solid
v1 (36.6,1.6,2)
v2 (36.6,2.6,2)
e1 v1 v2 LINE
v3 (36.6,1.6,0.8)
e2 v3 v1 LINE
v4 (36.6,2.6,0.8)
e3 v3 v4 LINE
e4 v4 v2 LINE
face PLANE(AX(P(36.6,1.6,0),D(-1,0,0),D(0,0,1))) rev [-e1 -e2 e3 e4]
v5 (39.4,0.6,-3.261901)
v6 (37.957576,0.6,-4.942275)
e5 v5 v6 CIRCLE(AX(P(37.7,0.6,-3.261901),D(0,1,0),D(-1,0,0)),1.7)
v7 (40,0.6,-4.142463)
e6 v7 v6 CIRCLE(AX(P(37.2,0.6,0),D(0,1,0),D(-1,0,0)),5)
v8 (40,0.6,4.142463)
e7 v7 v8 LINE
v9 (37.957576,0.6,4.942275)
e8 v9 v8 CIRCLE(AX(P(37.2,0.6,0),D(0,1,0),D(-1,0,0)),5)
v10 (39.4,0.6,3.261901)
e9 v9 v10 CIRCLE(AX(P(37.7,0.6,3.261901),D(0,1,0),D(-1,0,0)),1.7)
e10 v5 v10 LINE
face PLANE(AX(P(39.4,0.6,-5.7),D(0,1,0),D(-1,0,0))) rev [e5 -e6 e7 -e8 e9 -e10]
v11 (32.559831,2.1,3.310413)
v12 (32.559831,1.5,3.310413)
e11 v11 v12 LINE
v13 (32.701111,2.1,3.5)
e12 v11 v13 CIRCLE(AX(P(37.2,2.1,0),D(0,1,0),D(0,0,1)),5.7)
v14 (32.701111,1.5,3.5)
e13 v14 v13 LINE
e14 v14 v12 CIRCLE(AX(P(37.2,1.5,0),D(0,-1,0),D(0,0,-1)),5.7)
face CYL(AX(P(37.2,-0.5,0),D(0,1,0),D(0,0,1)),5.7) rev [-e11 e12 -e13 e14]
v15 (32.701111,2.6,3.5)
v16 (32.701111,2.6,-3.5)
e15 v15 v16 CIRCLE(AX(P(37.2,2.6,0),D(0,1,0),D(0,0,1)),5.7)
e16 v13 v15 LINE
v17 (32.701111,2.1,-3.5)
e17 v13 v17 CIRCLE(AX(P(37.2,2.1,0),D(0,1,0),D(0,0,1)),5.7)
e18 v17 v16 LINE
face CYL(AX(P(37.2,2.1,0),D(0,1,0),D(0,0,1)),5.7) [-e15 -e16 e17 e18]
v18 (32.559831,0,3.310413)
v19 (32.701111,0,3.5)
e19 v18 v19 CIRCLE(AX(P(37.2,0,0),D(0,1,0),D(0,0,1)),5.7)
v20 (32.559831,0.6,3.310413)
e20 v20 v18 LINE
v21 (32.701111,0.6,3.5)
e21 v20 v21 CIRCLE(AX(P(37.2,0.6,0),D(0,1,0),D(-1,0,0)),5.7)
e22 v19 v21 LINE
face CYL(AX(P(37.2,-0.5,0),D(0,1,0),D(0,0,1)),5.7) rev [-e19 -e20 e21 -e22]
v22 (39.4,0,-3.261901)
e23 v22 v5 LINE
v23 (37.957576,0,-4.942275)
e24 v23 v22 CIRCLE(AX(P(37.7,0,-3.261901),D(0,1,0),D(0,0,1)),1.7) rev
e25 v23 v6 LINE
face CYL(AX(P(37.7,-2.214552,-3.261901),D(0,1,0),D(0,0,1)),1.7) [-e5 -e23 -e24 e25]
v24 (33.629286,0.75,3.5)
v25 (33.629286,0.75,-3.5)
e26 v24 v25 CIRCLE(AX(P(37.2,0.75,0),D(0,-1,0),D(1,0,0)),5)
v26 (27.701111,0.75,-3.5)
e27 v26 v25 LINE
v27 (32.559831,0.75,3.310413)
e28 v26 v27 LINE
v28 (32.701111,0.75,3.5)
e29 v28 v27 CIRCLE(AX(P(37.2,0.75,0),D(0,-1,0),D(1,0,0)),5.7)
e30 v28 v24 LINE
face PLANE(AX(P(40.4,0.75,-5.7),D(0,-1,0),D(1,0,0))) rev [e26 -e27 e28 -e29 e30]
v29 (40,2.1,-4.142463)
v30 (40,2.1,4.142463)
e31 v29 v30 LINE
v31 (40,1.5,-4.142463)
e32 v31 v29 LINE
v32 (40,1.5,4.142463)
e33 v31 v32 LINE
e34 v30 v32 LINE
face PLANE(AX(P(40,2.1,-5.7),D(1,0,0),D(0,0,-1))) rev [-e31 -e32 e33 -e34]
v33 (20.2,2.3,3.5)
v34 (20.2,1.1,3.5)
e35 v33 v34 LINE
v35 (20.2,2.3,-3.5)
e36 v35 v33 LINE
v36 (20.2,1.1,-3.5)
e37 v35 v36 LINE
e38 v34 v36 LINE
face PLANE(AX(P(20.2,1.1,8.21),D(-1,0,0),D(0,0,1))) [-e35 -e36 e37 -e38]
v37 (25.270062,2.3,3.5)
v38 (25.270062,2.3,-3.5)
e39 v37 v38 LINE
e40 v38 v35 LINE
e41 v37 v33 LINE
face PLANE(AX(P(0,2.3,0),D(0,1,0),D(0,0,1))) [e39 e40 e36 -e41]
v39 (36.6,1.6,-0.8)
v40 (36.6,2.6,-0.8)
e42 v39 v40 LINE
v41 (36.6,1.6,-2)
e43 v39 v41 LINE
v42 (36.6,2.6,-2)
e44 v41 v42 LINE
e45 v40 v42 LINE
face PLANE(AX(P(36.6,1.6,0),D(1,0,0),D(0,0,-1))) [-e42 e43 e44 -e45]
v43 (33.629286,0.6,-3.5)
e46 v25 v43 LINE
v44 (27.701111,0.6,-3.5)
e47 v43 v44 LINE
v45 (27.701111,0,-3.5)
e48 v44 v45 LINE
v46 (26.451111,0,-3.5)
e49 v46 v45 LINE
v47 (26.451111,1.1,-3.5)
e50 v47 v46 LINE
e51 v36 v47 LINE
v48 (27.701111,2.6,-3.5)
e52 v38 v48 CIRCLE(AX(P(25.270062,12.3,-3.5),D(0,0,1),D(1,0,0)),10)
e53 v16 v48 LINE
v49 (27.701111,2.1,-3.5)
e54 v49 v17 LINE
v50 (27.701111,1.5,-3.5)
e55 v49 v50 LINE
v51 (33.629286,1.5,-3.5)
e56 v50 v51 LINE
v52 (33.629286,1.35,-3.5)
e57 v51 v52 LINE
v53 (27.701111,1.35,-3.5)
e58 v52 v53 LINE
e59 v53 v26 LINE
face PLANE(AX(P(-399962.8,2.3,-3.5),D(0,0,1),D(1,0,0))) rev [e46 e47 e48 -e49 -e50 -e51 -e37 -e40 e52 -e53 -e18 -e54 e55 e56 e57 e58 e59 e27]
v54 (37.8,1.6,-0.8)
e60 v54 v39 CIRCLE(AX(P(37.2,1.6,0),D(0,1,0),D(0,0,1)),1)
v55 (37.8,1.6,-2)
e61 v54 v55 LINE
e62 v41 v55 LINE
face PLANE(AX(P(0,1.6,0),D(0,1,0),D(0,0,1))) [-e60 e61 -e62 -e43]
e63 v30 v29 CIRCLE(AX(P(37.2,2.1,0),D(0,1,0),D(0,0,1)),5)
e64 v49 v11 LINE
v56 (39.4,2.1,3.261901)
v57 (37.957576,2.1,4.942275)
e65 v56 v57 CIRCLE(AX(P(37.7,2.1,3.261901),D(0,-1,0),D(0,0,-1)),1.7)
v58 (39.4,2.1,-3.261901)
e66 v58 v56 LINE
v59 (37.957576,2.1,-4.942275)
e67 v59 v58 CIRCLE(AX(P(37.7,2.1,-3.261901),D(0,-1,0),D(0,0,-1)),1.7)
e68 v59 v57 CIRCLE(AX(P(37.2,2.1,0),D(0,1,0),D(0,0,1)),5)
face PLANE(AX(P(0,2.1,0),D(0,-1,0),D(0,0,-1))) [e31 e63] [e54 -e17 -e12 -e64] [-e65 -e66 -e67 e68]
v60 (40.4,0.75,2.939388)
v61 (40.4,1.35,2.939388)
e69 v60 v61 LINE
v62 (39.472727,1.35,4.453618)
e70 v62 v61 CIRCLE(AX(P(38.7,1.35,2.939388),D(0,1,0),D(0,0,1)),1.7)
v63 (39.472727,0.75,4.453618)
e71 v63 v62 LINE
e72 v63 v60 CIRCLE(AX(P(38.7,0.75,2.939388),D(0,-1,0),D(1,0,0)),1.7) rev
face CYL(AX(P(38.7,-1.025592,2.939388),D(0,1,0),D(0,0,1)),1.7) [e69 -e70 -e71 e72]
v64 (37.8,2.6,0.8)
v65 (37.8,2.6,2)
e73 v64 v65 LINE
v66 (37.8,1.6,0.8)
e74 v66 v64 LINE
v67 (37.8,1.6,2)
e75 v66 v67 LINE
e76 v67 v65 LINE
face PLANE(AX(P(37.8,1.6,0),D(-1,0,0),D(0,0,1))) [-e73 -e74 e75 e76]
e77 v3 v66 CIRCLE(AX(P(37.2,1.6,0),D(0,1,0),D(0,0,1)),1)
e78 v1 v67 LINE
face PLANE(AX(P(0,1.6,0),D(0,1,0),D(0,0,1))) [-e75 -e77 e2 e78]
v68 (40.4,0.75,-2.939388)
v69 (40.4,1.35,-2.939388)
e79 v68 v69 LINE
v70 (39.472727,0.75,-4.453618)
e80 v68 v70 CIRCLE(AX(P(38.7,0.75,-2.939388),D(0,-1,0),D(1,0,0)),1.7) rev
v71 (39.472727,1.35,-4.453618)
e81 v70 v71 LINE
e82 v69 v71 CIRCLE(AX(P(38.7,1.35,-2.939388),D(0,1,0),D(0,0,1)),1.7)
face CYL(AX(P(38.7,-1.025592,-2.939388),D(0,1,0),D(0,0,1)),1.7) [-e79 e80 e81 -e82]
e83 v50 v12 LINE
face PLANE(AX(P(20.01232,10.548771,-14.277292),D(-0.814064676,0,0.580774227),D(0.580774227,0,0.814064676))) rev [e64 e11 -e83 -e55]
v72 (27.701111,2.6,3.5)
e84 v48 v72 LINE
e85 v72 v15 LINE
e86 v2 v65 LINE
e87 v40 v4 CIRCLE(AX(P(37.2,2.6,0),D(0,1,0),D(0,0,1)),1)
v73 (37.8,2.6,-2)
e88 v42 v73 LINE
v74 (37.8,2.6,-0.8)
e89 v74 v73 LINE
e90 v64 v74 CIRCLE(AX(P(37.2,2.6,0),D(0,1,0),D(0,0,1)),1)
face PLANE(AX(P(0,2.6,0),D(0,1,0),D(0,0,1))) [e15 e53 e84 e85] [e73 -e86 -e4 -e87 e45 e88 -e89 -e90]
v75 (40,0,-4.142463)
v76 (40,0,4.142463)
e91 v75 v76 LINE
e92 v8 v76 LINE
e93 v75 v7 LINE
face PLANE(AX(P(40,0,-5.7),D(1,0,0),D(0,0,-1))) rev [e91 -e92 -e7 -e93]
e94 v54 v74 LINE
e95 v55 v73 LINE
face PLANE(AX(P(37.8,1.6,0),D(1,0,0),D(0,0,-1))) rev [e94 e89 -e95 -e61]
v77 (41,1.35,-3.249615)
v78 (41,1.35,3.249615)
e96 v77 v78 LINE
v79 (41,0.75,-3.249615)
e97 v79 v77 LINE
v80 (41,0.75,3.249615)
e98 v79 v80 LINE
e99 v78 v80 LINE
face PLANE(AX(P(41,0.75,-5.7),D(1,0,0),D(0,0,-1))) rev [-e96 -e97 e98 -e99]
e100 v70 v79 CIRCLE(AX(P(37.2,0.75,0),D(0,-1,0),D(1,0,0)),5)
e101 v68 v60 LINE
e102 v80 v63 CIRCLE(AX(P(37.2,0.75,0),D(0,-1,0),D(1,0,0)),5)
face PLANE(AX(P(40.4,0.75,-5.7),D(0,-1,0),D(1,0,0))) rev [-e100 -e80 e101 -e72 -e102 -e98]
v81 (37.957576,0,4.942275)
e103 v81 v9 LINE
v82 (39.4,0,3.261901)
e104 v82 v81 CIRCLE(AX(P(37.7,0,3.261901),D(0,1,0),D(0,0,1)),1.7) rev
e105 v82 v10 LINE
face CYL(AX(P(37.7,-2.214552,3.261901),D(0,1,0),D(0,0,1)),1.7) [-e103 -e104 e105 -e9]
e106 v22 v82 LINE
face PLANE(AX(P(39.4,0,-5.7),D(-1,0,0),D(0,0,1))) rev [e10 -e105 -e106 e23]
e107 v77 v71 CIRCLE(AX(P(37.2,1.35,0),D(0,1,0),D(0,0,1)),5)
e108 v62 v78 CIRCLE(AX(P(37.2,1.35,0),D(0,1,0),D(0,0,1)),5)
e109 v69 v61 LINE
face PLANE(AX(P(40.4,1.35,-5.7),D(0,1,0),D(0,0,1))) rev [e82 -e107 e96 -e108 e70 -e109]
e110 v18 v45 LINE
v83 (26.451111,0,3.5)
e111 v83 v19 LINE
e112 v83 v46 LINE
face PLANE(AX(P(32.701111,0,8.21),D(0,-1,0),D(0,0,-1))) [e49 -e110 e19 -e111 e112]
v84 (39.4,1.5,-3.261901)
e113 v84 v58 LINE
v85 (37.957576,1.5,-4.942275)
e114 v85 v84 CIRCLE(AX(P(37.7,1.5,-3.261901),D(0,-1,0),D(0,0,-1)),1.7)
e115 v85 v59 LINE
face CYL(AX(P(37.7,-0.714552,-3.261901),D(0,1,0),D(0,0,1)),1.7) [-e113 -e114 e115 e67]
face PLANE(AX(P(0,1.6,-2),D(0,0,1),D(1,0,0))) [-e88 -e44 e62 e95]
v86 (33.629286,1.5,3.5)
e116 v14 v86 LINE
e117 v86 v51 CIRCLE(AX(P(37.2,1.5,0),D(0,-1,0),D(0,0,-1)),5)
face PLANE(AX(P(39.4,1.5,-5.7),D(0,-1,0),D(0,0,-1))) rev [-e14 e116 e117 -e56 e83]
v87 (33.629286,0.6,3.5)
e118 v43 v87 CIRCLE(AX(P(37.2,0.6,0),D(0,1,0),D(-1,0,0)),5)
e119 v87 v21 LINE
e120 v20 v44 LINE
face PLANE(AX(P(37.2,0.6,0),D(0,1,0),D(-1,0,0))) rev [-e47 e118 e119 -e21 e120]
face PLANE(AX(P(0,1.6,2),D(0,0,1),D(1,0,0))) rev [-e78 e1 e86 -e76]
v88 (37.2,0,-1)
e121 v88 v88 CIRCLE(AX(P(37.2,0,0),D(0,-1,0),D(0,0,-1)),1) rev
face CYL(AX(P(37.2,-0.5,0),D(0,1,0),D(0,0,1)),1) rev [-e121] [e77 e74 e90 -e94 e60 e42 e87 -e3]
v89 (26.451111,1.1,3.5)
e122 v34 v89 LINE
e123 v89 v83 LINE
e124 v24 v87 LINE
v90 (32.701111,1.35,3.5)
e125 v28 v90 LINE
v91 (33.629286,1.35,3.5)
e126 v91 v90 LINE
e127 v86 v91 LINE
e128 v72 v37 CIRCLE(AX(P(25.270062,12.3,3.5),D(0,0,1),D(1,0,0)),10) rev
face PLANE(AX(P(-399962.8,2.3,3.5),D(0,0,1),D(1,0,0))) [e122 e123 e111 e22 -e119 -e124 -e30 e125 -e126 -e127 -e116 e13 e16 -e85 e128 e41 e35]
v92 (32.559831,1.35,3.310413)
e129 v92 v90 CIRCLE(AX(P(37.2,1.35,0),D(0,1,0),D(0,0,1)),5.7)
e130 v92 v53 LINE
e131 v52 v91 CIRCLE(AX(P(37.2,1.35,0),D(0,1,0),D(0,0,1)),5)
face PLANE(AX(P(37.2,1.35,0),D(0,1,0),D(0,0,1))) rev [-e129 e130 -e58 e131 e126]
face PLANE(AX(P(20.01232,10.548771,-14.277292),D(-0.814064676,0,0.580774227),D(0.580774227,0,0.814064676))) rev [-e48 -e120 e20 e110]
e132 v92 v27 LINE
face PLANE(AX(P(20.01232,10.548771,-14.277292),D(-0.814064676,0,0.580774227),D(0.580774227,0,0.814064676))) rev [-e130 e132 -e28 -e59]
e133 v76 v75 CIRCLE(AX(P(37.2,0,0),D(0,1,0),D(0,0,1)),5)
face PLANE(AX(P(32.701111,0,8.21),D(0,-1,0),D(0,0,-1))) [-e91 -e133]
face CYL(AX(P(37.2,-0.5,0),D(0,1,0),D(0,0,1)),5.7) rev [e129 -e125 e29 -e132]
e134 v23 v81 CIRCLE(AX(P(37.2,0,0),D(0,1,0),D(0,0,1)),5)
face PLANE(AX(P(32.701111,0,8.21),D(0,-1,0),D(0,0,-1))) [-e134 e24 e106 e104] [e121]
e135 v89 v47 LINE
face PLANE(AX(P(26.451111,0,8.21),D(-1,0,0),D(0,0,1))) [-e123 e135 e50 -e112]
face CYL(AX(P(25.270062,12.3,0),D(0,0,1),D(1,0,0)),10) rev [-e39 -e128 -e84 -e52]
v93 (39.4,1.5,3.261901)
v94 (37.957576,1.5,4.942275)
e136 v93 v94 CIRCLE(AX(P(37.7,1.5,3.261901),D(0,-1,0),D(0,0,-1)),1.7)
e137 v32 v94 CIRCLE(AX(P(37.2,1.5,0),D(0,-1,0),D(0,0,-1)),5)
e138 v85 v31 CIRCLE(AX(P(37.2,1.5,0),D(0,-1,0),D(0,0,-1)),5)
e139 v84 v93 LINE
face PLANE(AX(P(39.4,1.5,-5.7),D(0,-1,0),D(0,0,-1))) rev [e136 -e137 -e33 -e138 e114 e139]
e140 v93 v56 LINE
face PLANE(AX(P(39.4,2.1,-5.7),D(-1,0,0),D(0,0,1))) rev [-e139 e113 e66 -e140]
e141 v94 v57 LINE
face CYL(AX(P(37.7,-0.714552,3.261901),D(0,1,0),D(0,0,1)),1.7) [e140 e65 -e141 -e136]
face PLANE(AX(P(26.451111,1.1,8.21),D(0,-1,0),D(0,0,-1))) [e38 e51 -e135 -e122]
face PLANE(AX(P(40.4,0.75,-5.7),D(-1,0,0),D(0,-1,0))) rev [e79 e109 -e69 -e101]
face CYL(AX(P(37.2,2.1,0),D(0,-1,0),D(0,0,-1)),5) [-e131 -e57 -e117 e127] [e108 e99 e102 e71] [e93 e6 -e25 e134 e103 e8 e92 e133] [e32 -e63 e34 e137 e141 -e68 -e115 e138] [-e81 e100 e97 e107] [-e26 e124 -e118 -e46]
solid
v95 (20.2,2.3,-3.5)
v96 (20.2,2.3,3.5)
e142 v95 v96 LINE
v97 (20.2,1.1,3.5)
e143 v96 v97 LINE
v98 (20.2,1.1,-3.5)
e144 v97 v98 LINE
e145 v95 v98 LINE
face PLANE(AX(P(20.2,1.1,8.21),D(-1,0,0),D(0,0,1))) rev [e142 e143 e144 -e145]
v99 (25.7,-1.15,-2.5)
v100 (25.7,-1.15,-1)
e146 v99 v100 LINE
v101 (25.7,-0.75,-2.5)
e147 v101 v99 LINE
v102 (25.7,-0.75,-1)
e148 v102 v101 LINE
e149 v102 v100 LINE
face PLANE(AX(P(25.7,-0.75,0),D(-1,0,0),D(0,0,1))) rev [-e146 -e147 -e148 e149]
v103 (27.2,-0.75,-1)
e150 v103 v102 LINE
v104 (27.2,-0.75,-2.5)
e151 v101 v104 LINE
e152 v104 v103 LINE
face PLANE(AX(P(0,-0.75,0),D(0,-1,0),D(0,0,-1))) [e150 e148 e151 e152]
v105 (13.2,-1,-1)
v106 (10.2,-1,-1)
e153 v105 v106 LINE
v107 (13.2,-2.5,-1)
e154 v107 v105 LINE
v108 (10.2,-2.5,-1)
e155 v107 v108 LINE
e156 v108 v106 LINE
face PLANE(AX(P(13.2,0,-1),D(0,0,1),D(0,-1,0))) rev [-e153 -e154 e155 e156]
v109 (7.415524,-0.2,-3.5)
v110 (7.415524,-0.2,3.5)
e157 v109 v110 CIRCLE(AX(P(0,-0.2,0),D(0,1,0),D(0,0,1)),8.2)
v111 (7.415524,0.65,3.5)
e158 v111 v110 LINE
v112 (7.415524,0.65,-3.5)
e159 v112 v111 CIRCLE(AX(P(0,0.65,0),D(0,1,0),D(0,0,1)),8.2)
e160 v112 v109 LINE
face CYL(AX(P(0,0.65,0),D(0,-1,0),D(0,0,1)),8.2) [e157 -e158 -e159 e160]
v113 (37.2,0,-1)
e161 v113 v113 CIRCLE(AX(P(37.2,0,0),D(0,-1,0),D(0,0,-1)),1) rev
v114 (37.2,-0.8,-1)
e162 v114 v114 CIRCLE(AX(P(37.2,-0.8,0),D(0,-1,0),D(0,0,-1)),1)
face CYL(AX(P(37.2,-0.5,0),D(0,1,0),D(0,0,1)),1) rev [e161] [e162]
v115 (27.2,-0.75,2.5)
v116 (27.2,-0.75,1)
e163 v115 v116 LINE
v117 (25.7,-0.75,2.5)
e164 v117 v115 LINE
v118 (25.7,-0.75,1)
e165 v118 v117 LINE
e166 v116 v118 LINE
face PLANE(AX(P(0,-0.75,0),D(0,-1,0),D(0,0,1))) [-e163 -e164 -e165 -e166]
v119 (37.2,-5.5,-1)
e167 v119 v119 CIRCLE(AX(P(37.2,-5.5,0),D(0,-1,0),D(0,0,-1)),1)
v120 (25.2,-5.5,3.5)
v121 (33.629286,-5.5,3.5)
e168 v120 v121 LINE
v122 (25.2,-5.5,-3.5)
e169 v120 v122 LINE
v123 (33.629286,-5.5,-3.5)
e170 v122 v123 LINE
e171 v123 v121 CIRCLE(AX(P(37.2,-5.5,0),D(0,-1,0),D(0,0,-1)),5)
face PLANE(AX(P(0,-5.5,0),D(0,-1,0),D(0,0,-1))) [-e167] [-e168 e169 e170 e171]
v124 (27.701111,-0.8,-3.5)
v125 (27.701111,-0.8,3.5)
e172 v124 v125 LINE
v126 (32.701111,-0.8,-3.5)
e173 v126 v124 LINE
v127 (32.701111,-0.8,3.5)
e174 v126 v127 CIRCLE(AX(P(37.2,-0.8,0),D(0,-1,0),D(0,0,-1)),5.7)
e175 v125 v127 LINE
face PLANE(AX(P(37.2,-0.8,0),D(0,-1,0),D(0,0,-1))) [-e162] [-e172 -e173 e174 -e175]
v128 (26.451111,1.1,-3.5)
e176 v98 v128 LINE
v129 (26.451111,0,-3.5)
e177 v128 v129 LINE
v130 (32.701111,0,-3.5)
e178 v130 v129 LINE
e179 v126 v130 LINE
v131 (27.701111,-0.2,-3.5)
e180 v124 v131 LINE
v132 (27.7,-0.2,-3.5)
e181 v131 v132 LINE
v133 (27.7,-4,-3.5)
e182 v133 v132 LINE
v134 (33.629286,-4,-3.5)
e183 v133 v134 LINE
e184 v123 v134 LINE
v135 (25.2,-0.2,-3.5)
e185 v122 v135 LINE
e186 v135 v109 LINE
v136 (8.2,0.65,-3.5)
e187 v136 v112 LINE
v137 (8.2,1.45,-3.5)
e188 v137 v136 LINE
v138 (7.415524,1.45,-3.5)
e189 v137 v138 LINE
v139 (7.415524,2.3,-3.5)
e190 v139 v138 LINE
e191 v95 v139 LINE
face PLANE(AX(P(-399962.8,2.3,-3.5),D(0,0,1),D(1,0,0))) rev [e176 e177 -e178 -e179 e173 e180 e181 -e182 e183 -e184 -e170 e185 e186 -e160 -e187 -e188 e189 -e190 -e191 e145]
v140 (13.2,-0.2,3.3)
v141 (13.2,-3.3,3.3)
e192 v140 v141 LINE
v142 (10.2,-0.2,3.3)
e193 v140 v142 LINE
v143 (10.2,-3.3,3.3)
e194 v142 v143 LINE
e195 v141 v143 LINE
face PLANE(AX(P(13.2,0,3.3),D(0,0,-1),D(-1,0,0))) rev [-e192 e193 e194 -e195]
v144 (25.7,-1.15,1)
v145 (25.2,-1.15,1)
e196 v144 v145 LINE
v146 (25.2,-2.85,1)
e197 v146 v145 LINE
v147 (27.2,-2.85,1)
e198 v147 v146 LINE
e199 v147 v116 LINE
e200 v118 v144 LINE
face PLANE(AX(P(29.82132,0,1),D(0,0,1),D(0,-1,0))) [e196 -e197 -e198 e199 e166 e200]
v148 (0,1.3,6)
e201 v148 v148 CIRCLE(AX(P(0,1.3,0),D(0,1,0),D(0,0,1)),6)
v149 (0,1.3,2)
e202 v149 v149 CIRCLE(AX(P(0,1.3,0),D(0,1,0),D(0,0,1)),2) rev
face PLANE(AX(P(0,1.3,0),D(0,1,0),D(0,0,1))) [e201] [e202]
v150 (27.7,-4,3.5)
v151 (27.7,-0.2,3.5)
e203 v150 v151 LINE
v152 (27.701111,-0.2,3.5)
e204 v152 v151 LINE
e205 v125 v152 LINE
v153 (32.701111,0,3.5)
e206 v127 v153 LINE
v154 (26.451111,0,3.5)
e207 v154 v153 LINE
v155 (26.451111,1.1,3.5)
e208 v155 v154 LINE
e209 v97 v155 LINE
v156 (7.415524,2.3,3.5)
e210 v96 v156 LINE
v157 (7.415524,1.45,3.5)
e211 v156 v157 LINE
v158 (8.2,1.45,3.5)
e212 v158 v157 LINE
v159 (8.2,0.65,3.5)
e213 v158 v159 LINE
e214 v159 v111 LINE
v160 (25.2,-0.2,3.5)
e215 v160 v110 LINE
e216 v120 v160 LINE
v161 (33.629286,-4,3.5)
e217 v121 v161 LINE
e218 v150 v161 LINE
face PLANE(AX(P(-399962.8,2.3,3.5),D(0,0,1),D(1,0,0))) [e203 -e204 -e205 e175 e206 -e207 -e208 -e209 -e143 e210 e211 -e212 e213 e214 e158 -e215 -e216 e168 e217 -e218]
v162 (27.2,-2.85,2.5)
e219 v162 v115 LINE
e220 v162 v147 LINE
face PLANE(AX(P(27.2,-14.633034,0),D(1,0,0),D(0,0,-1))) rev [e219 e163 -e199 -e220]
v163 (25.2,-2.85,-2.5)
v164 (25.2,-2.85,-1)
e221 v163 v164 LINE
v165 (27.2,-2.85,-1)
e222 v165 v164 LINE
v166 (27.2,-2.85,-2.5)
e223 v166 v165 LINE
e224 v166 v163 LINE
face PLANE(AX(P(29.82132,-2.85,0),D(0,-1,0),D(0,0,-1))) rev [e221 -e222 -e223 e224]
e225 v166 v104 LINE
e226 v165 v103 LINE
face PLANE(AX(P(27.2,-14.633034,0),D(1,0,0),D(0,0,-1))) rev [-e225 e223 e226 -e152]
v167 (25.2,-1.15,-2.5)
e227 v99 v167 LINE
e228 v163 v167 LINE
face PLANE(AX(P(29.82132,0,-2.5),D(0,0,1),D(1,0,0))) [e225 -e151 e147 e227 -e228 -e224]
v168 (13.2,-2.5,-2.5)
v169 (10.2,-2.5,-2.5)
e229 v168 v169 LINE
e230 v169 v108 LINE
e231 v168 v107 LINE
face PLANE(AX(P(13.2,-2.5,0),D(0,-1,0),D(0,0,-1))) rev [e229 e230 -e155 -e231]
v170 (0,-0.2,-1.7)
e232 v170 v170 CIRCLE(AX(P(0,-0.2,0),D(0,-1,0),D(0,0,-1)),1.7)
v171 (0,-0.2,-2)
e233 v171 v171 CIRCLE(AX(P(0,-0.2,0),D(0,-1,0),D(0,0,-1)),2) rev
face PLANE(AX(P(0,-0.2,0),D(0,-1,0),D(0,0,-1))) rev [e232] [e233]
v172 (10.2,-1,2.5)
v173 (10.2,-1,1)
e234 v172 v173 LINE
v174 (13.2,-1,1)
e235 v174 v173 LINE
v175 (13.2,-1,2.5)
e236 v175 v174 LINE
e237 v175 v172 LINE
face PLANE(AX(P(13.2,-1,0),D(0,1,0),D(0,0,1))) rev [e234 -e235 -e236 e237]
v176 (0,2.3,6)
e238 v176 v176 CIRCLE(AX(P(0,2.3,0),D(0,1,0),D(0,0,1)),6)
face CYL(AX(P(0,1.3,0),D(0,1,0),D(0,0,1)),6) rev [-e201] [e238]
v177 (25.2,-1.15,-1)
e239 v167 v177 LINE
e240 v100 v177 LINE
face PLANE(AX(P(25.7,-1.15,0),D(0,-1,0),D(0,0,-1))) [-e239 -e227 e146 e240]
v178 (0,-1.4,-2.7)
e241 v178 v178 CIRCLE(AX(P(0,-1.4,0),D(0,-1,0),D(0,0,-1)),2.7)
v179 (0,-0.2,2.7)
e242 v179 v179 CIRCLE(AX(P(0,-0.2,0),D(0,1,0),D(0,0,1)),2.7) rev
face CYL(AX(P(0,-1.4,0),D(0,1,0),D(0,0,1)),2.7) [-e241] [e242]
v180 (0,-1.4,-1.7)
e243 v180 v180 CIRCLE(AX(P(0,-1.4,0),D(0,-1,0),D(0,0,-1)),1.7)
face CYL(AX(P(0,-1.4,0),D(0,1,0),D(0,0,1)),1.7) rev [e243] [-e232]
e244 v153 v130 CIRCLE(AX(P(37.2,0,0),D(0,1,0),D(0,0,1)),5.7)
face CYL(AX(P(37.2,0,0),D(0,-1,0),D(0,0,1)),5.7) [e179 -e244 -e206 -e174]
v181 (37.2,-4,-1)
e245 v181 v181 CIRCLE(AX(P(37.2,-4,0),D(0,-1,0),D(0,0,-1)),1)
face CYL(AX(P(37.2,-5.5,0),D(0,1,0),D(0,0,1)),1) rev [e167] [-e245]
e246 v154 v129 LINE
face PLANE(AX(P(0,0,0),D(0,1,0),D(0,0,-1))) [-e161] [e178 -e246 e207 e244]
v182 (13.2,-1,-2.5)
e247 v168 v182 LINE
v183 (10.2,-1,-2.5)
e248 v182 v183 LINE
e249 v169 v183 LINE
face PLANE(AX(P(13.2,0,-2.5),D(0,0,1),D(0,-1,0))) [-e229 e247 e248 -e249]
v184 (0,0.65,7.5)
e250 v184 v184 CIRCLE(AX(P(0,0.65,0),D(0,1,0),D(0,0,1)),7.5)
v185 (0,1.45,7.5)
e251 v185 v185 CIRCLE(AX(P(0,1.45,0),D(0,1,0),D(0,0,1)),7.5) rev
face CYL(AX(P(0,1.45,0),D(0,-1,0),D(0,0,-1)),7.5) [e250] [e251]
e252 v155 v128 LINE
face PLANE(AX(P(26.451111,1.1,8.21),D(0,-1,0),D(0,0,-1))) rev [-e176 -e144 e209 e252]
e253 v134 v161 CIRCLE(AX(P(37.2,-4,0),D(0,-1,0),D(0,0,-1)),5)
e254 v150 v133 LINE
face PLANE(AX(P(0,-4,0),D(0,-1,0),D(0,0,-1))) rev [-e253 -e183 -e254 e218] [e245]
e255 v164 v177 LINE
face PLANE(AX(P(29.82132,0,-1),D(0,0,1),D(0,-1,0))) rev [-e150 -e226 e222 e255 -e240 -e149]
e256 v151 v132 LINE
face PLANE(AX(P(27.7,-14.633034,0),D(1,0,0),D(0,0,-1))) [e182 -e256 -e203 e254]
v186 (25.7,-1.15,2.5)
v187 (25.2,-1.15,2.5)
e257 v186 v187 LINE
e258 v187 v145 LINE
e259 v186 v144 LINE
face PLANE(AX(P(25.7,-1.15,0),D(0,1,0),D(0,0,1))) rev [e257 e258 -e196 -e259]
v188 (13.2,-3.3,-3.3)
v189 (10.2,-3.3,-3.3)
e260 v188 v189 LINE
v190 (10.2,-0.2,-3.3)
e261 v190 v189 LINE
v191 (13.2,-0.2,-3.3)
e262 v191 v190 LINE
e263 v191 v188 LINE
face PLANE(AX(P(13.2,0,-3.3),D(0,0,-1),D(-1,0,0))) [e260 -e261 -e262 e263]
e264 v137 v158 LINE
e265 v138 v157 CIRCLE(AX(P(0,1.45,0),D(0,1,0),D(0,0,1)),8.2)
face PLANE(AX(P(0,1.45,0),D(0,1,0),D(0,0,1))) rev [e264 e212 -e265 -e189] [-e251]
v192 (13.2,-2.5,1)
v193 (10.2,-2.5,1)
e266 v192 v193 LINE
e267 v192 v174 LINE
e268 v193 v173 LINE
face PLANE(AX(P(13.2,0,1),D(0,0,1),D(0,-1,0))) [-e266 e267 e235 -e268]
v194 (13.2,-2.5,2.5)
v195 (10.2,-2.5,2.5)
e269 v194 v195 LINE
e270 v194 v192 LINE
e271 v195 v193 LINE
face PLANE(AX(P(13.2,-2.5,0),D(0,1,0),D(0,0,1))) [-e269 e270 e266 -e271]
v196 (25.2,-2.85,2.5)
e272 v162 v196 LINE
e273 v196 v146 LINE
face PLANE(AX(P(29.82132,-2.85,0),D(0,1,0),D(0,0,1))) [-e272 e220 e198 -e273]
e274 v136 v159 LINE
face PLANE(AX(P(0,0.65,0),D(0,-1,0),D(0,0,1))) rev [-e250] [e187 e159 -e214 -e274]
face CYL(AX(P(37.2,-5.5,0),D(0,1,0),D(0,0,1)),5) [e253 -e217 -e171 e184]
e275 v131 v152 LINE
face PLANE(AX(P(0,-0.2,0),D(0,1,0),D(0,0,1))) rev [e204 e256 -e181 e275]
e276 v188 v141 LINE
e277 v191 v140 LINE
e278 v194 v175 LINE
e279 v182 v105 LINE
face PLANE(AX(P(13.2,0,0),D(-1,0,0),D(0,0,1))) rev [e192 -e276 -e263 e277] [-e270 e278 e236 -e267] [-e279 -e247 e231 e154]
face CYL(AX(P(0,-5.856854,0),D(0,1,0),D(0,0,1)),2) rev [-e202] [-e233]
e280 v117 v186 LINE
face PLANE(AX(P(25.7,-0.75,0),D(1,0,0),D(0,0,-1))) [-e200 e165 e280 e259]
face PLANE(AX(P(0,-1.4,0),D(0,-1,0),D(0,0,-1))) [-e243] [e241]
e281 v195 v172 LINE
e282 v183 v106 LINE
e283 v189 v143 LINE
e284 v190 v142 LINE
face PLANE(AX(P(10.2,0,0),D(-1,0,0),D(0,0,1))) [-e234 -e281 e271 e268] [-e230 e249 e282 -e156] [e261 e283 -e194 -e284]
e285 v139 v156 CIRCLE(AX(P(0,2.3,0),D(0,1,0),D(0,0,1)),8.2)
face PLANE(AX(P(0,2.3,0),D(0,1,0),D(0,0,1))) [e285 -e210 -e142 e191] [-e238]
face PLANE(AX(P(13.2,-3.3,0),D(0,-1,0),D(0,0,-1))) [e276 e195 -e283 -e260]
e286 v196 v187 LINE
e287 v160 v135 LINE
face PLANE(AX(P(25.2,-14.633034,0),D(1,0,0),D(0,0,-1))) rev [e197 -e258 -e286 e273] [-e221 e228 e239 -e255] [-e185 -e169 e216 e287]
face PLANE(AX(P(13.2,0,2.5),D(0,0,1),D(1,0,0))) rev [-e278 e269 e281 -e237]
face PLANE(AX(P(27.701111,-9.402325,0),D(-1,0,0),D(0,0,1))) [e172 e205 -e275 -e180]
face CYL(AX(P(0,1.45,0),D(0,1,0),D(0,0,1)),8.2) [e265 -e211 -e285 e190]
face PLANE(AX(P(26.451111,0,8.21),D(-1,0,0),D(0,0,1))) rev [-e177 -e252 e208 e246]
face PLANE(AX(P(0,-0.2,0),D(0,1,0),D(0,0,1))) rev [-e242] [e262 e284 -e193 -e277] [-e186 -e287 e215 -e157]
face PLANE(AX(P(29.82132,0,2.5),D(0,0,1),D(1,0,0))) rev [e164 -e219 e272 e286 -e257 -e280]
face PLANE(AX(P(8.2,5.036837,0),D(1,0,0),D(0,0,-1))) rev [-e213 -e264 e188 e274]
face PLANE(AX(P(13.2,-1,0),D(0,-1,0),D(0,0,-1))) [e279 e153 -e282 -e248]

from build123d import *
from build123d.topology import SkipClean

# Parameters (mm, degrees)
SKETCH1_R                               = 5
ELBOWPULLEYMIDSECTION_DEPTH             = 2.1
SKETCH5_W                               = 0.6
SKETCH5_H                               = 0.6
CABLESLOTS_DEPTH                        = 45.290631063
RADIUSAXLEHOLE_DEPTH                    = 44.387901539
RADIUSAXLELOCK_DEPTH                    = 1
CABLESLOT1ENTRANCES_START               = -1.1
CABLESLOT1ENTRANCES_DEPTH               = 0.6
CABLESLOT2ENTRANCES_START               = -1.85
CABLESLOT2ENTRANCES_DEPTH               = 0.6
CABLESLOT3ENTRANCES_START               = -2.6
CABLESLOT3ENTRANCES_DEPTH               = 0.6
BONE_START                              = 1.05
BONE_DEPTH                              = 1.25
SKETCH15_W                              = 2.1
SKETCH15_H                              = 0.7
CABLECLEARANCECUT_DEPTH                 = 2.1
SKETCH37_R                              = 5.7
SKETCH37_R_2                            = 1
THICKNESSPADDING_FOR_PA12PRINTING_DEPTH = 0.3
THICKNESSPADDING_DEPTH                  = 0.3
THICKNESSPADDING2_START                 = -3.1
THICKNESSPADDING2_DEPTH                 = 0.6
SKETCH17_W                              = 2.5
SKETCH17_H                              = 7
RADIUSHOLDERCOLUMN_DEPTH                = 3.8
SKETCH32_W                              = 1.5
SKETCH32_H                              = 1.5
TUBECLIPENTRANCE_DEPTH                  = 2
SKETCH33_W                              = 1.5
SKETCH33_H                              = 1.5
TUBECLIPLOCKSLOT_DEPTH                  = 0.6
SKETCH46_W                              = 1.5
SKETCH46_H                              = 0.2
TUBECLIPLOCKCLEARANCE_DEPTH             = 0.5
SKETCH18_R                              = 1
RADIUSHOLDERMOUTH_DEPTH                 = 1.5
FILLET1_R                               = 10
SKETCH34_W                              = 6.6
SKETCH34_H                              = 3.1
SKETCH34_W_2                            = 1.5
SKETCH34_H_2                            = 1.5
TUBEGUIDES_DEPTH                        = 3
CABLESEPARATOR_START                    = 0.6
CABLESEPARATOR_DEPTH                    = 0.15
CABLESEPARATOR2_START                   = 1.35
CABLESEPARATOR2_DEPTH                   = 0.15
SKETCH40_R                              = 7.5
SHOULDERPULLEYMIDSECTION_DEPTH          = 0.4
CABLECLEARANCECUT2_DEPTH                = 0.8
SKETCH43_R                              = 2
BALLBEARINGSLOT_DEPTH                   = 2.5
SKETCH43_3_R                            = 6
SKETCH43_3_R_2                          = 2
BALLBEARINGCAPSLOT_DEPTH                = 1
SKETCH44_R                              = 2.7
SKETCH44_R_2                            = 1.7
BALLBEARINGSTOPPER_DEPTH                = 1.2
SPLIT1_SURFACE_1_BACK                   = 55.275
SPLIT1_SURFACE_1_DEPTH                  = 110.55
SPLIT1_SURFACE_2_BACK                   = 55.275
SPLIT1_SURFACE_2_DEPTH                  = 110.55


# Read off the part's stored shape, not the designer's step: CableSeparator, CableSeparator2
with BuildPart() as part:
    # Sketch1 → ElbowPulleyMidSection (new body)
    with BuildSketch(Plane(origin=(0, 0, 0), x_dir=(1, 0, 0), z_dir=(0, 1, 0))):
        with Locations(Location((37.2, 0, 0), (0, 0, 270))):
            Circle(SKETCH1_R)
    extrude(amount=ELBOWPULLEYMIDSECTION_DEPTH)

    # Sketch4 → ElbowPulleyCap (revolve)
    with BuildSketch(Plane.XY, mode=Mode.PRIVATE) as elbowpulleycap_sk:
        Polygon((37.2, 2.1), (42.2, 2.1), (42.9, 2.3), (42.9, 2.6), (37.2, 2.6), align=None)
        Polygon((42.2, 2.1), (42.9, 2.1), (42.9, 2.3), align=None)
    elbowpulleycap = revolve(elbowpulleycap_sk.sketch.rotate(Axis((37.2, 2.1, 0), (0, -1, 0)), 90), axis=Axis((37.2, 2.1, 0), (0, -1, 0)))

    # ElbowPulleyCap2: ElbowPulleyCap across plane
    add(elbowpulleycap.mirror(Plane.ZX.offset(1.05)))

    # Sketch5 → CableSlots (cut, through all)
    with BuildSketch(Plane.XY.offset(5)):
        with Locations((40.7, 1.05)):
            Rectangle(SKETCH5_W, SKETCH5_H)
        with Locations((39.7, 1.8)):
            Rectangle(SKETCH5_W, SKETCH5_H)
        with Locations((39.7, 0.3)):
            Rectangle(SKETCH5_W, SKETCH5_H)
    extrude(amount=-CABLESLOTS_DEPTH, mode=Mode.SUBTRACT)

    # Sketch6 → RadiusAxleHole (cut, through all)
    with SkipClean():  # the faces are left unmerged after this step: merging them gives an invalid solid
        with BuildSketch(Plane(origin=(0, 2.6, 0), x_dir=(1, 0, 0), z_dir=(0, 1, 0))):
            with BuildLine():
                Line((37.8, -0.8), (37.8, 0))
                Line((37.8, 0), (37.8, 0.8))
                ThreePointArc((37.8, 0.8), (37.2, 1), (36.6, 0.8))
                Line((36.6, 0.8), (36.6, 0))
                Line((36.6, 0), (36.6, -0.8))
                ThreePointArc((36.6, -0.8), (37.2, -1), (37.8, -0.8))
            make_face()
            with BuildLine():
                Line((37.8, 0.8), (37.8, 0))
                Line((37.8, 0), (37.8, -0.8))
                ThreePointArc((37.8, -0.8), (38.094427191, -0.447213595), (38.2, 0))
                ThreePointArc((38.2, 0), (38.094427191, 0.447213595), (37.8, 0.8))
            make_face()
            with BuildLine():
                Line((36.6, 0), (36.6, 0.8))
                ThreePointArc((36.6, 0.8), (36.2, 0), (36.6, -0.8))
                Line((36.6, -0.8), (36.6, 0))
            make_face()
        extrude(amount=-RADIUSAXLEHOLE_DEPTH, mode=Mode.SUBTRACT)
    add(part.part.scale(1), mode=Mode.REPLACE)  # the faces are merged on a copy

    # Sketch6<3> → RadiusAxleLock (cut)
    with BuildSketch(Plane(origin=(0, 2.6, 0), x_dir=(1, 0, 0), z_dir=(0, 1, 0))):
        with BuildLine():
            ThreePointArc((36.6, 0.8), (37.2, 1), (37.8, 0.8))
            Line((37.8, 0.8), (37.8, 2))
            Line((37.8, 2), (36.6, 2))
            Line((36.6, 2), (36.6, 0.8))
        make_face()
        with BuildLine():
            Line((37.8, -2), (37.8, -0.8))
            ThreePointArc((37.8, -0.8), (37.2, -1), (36.6, -0.8))
            Line((36.6, -0.8), (36.6, -2))
            Line((36.6, -2), (37.8, -2))
        make_face()
    extrude(amount=-RADIUSAXLELOCK_DEPTH, mode=Mode.SUBTRACT)

    # Sketch8 → CableSlot1Entrances (cut)
    with BuildSketch(Plane(origin=(0, 2.6, 0), x_dir=(1, 0, 0), z_dir=(0, 1, 0)).offset(CABLESLOT1ENTRANCES_START)):
        with BuildLine():
            Line((39.4, -4.489988864), (39.4, -3.261901286))
            ThreePointArc((39.4, -3.261901286), (38.989937748, -4.369177496), (37.957575758, -4.942274676))
            ThreePointArc((37.957575758, -4.942274676), (38.695979346, -4.770958582), (39.4, -4.489988864))
        make_face()
        with BuildLine():
            Line((39.4, 3.261901286), (39.4, 4.489988864))
            ThreePointArc((39.4, 4.489988864), (38.695979346, 4.770958582), (37.957575758, 4.942274676))
            ThreePointArc((37.957575758, 4.942274676), (38.989937748, 4.369177496), (39.4, 3.261901286))
        make_face()
    extrude(amount=CABLESLOT1ENTRANCES_DEPTH, mode=Mode.SUBTRACT)

    # Sketch8<3> → CableSlot2Entrances (cut)
    with BuildSketch(Plane(origin=(0, 2.6, 0), x_dir=(1, 0, 0), z_dir=(0, 1, 0)).offset(CABLESLOT2ENTRANCES_START)):
        with BuildLine():
            ThreePointArc((40, -4.142463035), (40.203762368, -3.997175458), (40.4, -3.841874542))
            Line((40.4, -3.841874542), (40.4, -2.939387691))
            ThreePointArc((40.4, -2.939387691), (40.149764871, -3.827183737), (39.472727273, -4.453617714))
            ThreePointArc((39.472727273, -4.453617714), (39.741130615, -4.306118344), (40, -4.142463035))
        make_face()
        with BuildLine():
            Line((40.4, 2.939387691), (40.4, 3.841874542))
            ThreePointArc((40.4, 3.841874542), (40.203762368, 3.997175458), (40, 4.142463035))
            ThreePointArc((40, 4.142463035), (39.741130615, 4.306118344), (39.472727273, 4.453617714))
            ThreePointArc((39.472727273, 4.453617714), (40.149764871, 3.827183737), (40.4, 2.939387691))
        make_face()
    extrude(amount=CABLESLOT2ENTRANCES_DEPTH, mode=Mode.SUBTRACT)

    # Sketch8<4> → CableSlot3Entrances (cut)
    with BuildSketch(Plane(origin=(0, 2.6, 0), x_dir=(1, 0, 0), z_dir=(0, 1, 0)).offset(CABLESLOT3ENTRANCES_START)):
        with BuildLine():
            Line((39.4, -4.489988864), (39.4, -3.261901286))
            ThreePointArc((39.4, -3.261901286), (38.989937748, -4.369177496), (37.957575758, -4.942274676))
            ThreePointArc((37.957575758, -4.942274676), (38.695979346, -4.770958582), (39.4, -4.489988864))
        make_face()
        with BuildLine():
            Line((39.4, 3.261901286), (39.4, 4.489988864))
            ThreePointArc((39.4, 4.489988864), (38.695979346, 4.770958582), (37.957575758, 4.942274676))
            ThreePointArc((37.957575758, 4.942274676), (38.989937748, 4.369177496), (39.4, 3.261901286))
        make_face()
    extrude(amount=CABLESLOT3ENTRANCES_DEPTH, mode=Mode.SUBTRACT)

    # Sketch1<4> → Bone (add, symmetric)
    with BuildSketch(Plane(origin=(0, 0, 0), x_dir=(1, 0, 0), z_dir=(0, 1, 0)).offset(BONE_START)):
        with BuildLine():
            Line((33.629285786, 3.5), (7.415524257, 3.5))
            ThreePointArc((7.415524257, 3.5), (8.2, 0), (7.415524257, -3.5))
            Line((7.415524257, -3.5), (33.629285786, -3.5))
            ThreePointArc((33.629285786, -3.5), (32.2, 0), (33.629285786, 3.5))
        make_face()
    extrude(amount=BONE_DEPTH, both=True)

    # Sketch15 → CableWay (revolve, cut)
    with BuildSketch(Plane(origin=(18.228, 0, 18.596279628), x_dir=(0, -1, 0), z_dir=(-0.6999999999988543, 0, -0.714142842855408)), mode=Mode.PRIVATE) as cableway_sk:
        with Locations((-1.05, -21.216113754)):
            Rectangle(SKETCH15_W, SKETCH15_H)
    revolve(cableway_sk.sketch.rotate(Axis((37.2, -0.5, 0), (0, 1, 0)), 45.572996), axis=Axis((37.2, -0.5, 0), (0, 1, 0)), mode=Mode.SUBTRACT)

    # Sketch26 → CableClearanceCut (cut)
    with BuildSketch(Plane(origin=(0, 0, 0), x_dir=(1, 0, 0), z_dir=(0, 1, 0))):
        with BuildLine():
            ThreePointArc((32.559831346, -3.310413095), (31.501226079, 0.118219293), (32.701111248, 3.5))
            Line((32.701111248, 3.5), (27.701111248, 3.5))
            Line((27.701111248, 3.5), (32.559831346, -3.310413095))
        make_face()
    extrude(amount=CABLECLEARANCECUT_DEPTH, mode=Mode.SUBTRACT)

    # Sketch37 → ThicknessPadding_for_PA12printing (add)
    with SkipClean():  # the faces are left unmerged after this step: merging them gives an invalid solid
        with BuildSketch(Plane.XZ.offset(0.5)):
            with Locations(Location((37.2, 0, 0), (0, 0, 90))):
                Circle(SKETCH37_R)
            with Locations(Location((37.2, 0, 0), (0, 0, 53.130102354))):
                Circle(SKETCH37_R_2, mode=Mode.SUBTRACT)
        extrude(amount=THICKNESSPADDING_FOR_PA12PRINTING_DEPTH)

    # Sketch27 → ThicknessPadding (add)
    with SkipClean():  # the faces are left unmerged after this step: merging them gives an invalid solid
        with BuildSketch(Plane(origin=(0, 2.3, 0), x_dir=(1, 0, 0), z_dir=(0, 1, 0))):
            with BuildLine():
                Line((33.629285786, 3.5), (27.701111248, 3.5))
                Line((27.701111248, 3.5), (27.701111248, -3.5))
                Line((27.701111248, -3.5), (33.629285786, -3.5))
                ThreePointArc((33.629285786, -3.5), (32.2, 0), (33.629285786, 3.5))
            make_face()
        extrude(amount=THICKNESSPADDING_DEPTH)

    # Sketch27<2> → ThicknessPadding2 (add)
    with SkipClean():  # the faces are left unmerged after this step: merging them gives an invalid solid
        with BuildSketch(Plane(origin=(0, 2.3, 0), x_dir=(1, 0, 0), z_dir=(0, 1, 0)).offset(THICKNESSPADDING2_START)):
            with BuildLine():
                Line((33.629285786, 3.5), (27.701111248, 3.5))
                Line((27.701111248, 3.5), (27.701111248, -3.5))
                Line((27.701111248, -3.5), (33.629285786, -3.5))
                ThreePointArc((33.629285786, -3.5), (32.2, 0), (33.629285786, 3.5))
            make_face()
        extrude(amount=THICKNESSPADDING2_DEPTH)

    # Sketch17 → RadiusHolderColumn (add)
    with SkipClean():  # the faces are left unmerged after this step: merging them gives an invalid solid
        with BuildSketch(Plane.XZ.offset(0.2)):
            with Locations((26.45, 0)):
                Rectangle(SKETCH17_W, SKETCH17_H)
        extrude(amount=RADIUSHOLDERCOLUMN_DEPTH)

    # Sketch32 → TubeClipEntrance (cut)
    with SkipClean():  # the faces are left unmerged after this step: merging them gives an invalid solid
        with BuildSketch(Plane.ZY.offset(-25.2)):
            with Locations((-1.75, -2.1)):
                Rectangle(SKETCH32_W, SKETCH32_H)
        tubeclipentrance = extrude(amount=-TUBECLIPENTRANCE_DEPTH, mode=Mode.SUBTRACT)

    # Sketch33 → TubeClipLockSlot (cut)
    with SkipClean():  # the faces are left unmerged after this step: merging them gives an invalid solid
        with BuildSketch(Plane(origin=(50.45, -1.35, 0), x_dir=(-1, 0, 0), z_dir=(0, 1, 0))):
            with Locations((24, -1.75)):
                Rectangle(SKETCH33_W, SKETCH33_H)
        tubecliplockslot = extrude(amount=TUBECLIPLOCKSLOT_DEPTH, mode=Mode.SUBTRACT)

    # Sketch46 → TubeClipLockClearance (cut)
    with SkipClean():  # the faces are left unmerged after this step: merging them gives an invalid solid
        with BuildSketch(Plane.ZY.offset(-25.2)):
            with Locations((-1.75, -1.25)):
                Rectangle(SKETCH46_W, SKETCH46_H)
        tubecliplockclearance = extrude(amount=-TUBECLIPLOCKCLEARANCE_DEPTH, mode=Mode.SUBTRACT)

    # TubeClipSlot2: TubeClipEntrance, TubeClipLockSlot, TubeClipLockClearance across plane
    with SkipClean():  # the faces are left unmerged after this step: merging them gives an invalid solid
        add(tubeclipentrance.mirror(Plane.XY), mode=Mode.SUBTRACT)
        add(tubecliplockslot.mirror(Plane.XY), mode=Mode.SUBTRACT)
        add(tubecliplockclearance.mirror(Plane.XY), mode=Mode.SUBTRACT)

    # Sketch18 → RadiusHolderMouth (add)
    with SkipClean():  # the faces are left unmerged after this step: merging them gives an invalid solid
        with BuildSketch(Plane.XZ.offset(4)):
            with BuildLine():
                Line((33.629285786, 3.5), (25.2, 3.5))
                Line((25.2, 3.5), (25.2, -3.5))
                Line((25.2, -3.5), (33.629285786, -3.5))
                ThreePointArc((33.629285786, -3.5), (42.2, 0), (33.629285786, 3.5))
            make_face()
            with Locations(Location((37.2, 0, 0), (0, 0, 53.130102354))):
                Circle(SKETCH18_R, mode=Mode.SUBTRACT)
        extrude(amount=RADIUSHOLDERMOUTH_DEPTH)

    # Fillet1
    # the kernel refuses this fillet: 10 mm, written as the material it adds along each edge
    with BuildSketch(Plane(origin=(27.701111248, 2.3, -3.5), x_dir=(-1, 0, 0), z_dir=(0, 0, 1))) as fillet1_piece_1:
        with BuildLine():
            CenterArc((2.431049156, -10), FILLET1_R, 90, 14.069867748)
            Line((0, -0.3), (-0.048620983, -0.106))
            ThreePointArc((-0.048620983, -0.106), (-0.2, -0.15), (-0.2, 0))
            Line((-0.2, 0), (0, 0.2))
            Line((0, 0.2), (2.431049156, 0.2))
            Line((2.431049156, 0.2), (2.431049156, 0))
        make_face()
    extrude(amount=7)

    # Sketch34 → TubeGuides (add)
    with BuildSketch(Plane.ZY.offset(-10.2)):
        with Locations((0, -1.75)):
            Rectangle(SKETCH34_W, SKETCH34_H)
        with Locations((-1.75, -1.75)):
            Rectangle(SKETCH34_W_2, SKETCH34_H_2, mode=Mode.SUBTRACT)
        with Locations((1.75, -1.75)):
            Rectangle(SKETCH34_W_2, SKETCH34_H_2, mode=Mode.SUBTRACT)
    extrude(amount=-TUBEGUIDES_DEPTH)

    # CableSeparator outline → CableSeparator (add)
    with BuildSketch(Plane(origin=(0, 0, 0), x_dir=(1, 0, 0), z_dir=(0, 1, 0)).offset(CABLESEPARATOR_START)):
        with BuildLine():
            Line((27.701111248, 3.5), (32.559831346, -3.310413095))
            ThreePointArc((32.559831346, -3.310413095), (32.629488173, -3.40593917), (32.701111248, -3.5))
            Line((32.701111248, -3.5), (33.629285786, -3.5))
            ThreePointArc((33.629285786, -3.5), (32.2, 0), (33.629285786, 3.5))
            Line((33.629285786, 3.5), (27.701111248, 3.5))
        make_face()
    extrude(amount=CABLESEPARATOR_DEPTH)

    # CableSeparator2 outline → CableSeparator2 (add)
    with BuildSketch(Plane(origin=(0, 0, 0), x_dir=(1, 0, 0), z_dir=(0, 1, 0)).offset(CABLESEPARATOR2_START)):
        with BuildLine():
            Line((27.701111248, 3.5), (32.559831346, -3.310413095))
            ThreePointArc((32.559831346, -3.310413095), (32.629488173, -3.40593917), (32.701111248, -3.5))
            Line((32.701111248, -3.5), (33.629285786, -3.5))
            ThreePointArc((33.629285786, -3.5), (32.2, 0), (33.629285786, 3.5))
            Line((33.629285786, 3.5), (27.701111248, 3.5))
        make_face()
    extrude(amount=CABLESEPARATOR2_DEPTH)



with BuildPart() as body_2:
    # Sketch40 → ShoulderPulleyMidSection (new, symmetric)
    with BuildSketch(Plane(origin=(0, 1.05, 0), x_dir=(1, 0, 0), z_dir=(0, 1, 0))):
        with Locations(Location((0, 0, 0), (0, 0, 270))):
            Circle(SKETCH40_R)
    extrude(amount=SHOULDERPULLEYMIDSECTION_DEPTH, both=True)


with BuildPart() as part_1:
    add(part.part)

    add(body_2.part)  # ShoulderPulleyCap merges body 2
    # Sketch41 → ShoulderPulleyCap (revolve)
    with BuildSketch(Plane.XY):
        Polygon((0, 1.45), (7.5, 1.45), (8.2, 1.45), (8.2, 2.3), (0, 2.3), align=None)
    shoulderpulleycap = revolve(axis=Axis((0, 1.45, 0), (0, -1, 0)))

    # ShoulderPulleyCap2: ShoulderPulleyCap across plane
    add(shoulderpulleycap.mirror(Plane.ZX.offset(1.05)))

    # Sketch42 → CableClearanceCut2 (cut)
    with BuildSketch(Plane(origin=(0, 0.65, 0), x_dir=(1, 0, 0), z_dir=(0, 1, 0))):
        with BuildLine():
            Line((8.2, -3.5), (8.2, -1e-09))
            ThreePointArc((8.2, -1e-09), (8.001477954, -1.793418676), (7.415524257, -3.5))
            Line((7.415524257, -3.5), (8.2, -3.5))
        make_face()
        with BuildLine():
            Line((8.2, -1e-09), (8.2, 3.5))
            Line((8.2, 3.5), (7.415524257, 3.5))
            ThreePointArc((7.415524257, 3.5), (8.001477954, 1.793418676), (8.2, -1e-09))
        make_face()
    extrude(amount=CABLECLEARANCECUT2_DEPTH, mode=Mode.SUBTRACT)

    # Sketch43 → BallBearingSlot (cut)
    with BuildSketch(Plane(origin=(0, 2.3, 0), x_dir=(1, 0, 0), z_dir=(0, 1, 0))):
        with Locations(Location((0, 0, 0), (0, 0, 270))):
            Circle(SKETCH43_R)
    extrude(amount=-BALLBEARINGSLOT_DEPTH, mode=Mode.SUBTRACT)

    # Sketch43<3> → BallBearingCapSlot (cut)
    # profile 1 of 2: a face of its own
    with BuildSketch(Plane(origin=(0, 2.3, 0), x_dir=(1, 0, 0), z_dir=(0, 1, 0))):
        with Locations(Location((0, 0, 0), (0, 0, 270))):
            Circle(SKETCH43_3_R)
        with Locations(Location((0, 0, 0), (0, 0, 270))):
            Circle(SKETCH43_3_R_2, mode=Mode.SUBTRACT)
    # profile 2 of 2: a face of its own
    with BuildSketch(Plane(origin=(0, 2.3, 0), x_dir=(1, 0, 0), z_dir=(0, 1, 0))):
        with Locations(Location((0, 0, 0), (0, 0, 270))):
            Circle(SKETCH43_3_R_2)
    extrude(amount=-BALLBEARINGCAPSLOT_DEPTH, mode=Mode.SUBTRACT)

    # Sketch44 → BallBearingStopper (add)
    with BuildSketch(Plane.XZ.offset(0.2)):
        with Locations(Location((0, 0, 0), (0, 0, 90))):
            Circle(SKETCH44_R)
        with Locations(Location((0, 0, 0), (0, 0, 270))):
            Circle(SKETCH44_R_2, mode=Mode.SUBTRACT)
    extrude(amount=BALLBEARINGSTOPPER_DEPTH)


with BuildPart() as body_2_2:
    # Split1: the piece behind the surface
    add(part_1.part)
    # Split1 surface: a surface, the sketch's curves swept straight by 110.55 mm
    with BuildLine(Plane(origin=(0, 0, -3.5), x_dir=(-1, 0, 0), z_dir=(0, 0, -1)).offset(-SPLIT1_SURFACE_1_BACK), mode=Mode.PRIVATE) as split1_surface_1_path:
        Line((-20.2, 2.3), (-20.2, 1.1))
        Line((-20.2, 1.1), (-26.451111248, 1.1))
        Line((-26.451111248, 1.1), (-26.451111248, 0))
        Line((-26.451111248, 0), (-27.701111248, 0))
        Line((-27.701111248, 0), (-32.701111248, 0))
        Line((-32.701111248, 0), (-42.9, 0))
    split1_surface_1 = Shell.extrude(split1_surface_1_path.wire(), (0 * SPLIT1_SURFACE_1_DEPTH, 0 * SPLIT1_SURFACE_1_DEPTH, -1 * SPLIT1_SURFACE_1_DEPTH))
    split(bisect_by=split1_surface_1, keep=Keep.BOTTOM)


with BuildPart() as part_2:
    add(part_1.part)

    # Split1: split by a surface, the side it looks to stays
    # Split1 surface: a surface, the sketch's curves swept straight by 110.55 mm
    with BuildLine(Plane(origin=(0, 0, -3.5), x_dir=(-1, 0, 0), z_dir=(0, 0, -1)).offset(-SPLIT1_SURFACE_2_BACK), mode=Mode.PRIVATE) as split1_surface_2_path:
        Line((-20.2, 2.3), (-20.2, 1.1))
        Line((-20.2, 1.1), (-26.451111248, 1.1))
        Line((-26.451111248, 1.1), (-26.451111248, 0))
        Line((-26.451111248, 0), (-27.701111248, 0))
        Line((-27.701111248, 0), (-32.701111248, 0))
        Line((-32.701111248, 0), (-42.9, 0))
    split1_surface_2 = Shell.extrude(split1_surface_2_path.wire(), (0 * SPLIT1_SURFACE_2_DEPTH, 0 * SPLIT1_SURFACE_2_DEPTH, -1 * SPLIT1_SURFACE_2_DEPTH))
    split(bisect_by=split1_surface_2, keep=Keep.TOP)


solid = Compound([body_2_2.part, part_2.part])
